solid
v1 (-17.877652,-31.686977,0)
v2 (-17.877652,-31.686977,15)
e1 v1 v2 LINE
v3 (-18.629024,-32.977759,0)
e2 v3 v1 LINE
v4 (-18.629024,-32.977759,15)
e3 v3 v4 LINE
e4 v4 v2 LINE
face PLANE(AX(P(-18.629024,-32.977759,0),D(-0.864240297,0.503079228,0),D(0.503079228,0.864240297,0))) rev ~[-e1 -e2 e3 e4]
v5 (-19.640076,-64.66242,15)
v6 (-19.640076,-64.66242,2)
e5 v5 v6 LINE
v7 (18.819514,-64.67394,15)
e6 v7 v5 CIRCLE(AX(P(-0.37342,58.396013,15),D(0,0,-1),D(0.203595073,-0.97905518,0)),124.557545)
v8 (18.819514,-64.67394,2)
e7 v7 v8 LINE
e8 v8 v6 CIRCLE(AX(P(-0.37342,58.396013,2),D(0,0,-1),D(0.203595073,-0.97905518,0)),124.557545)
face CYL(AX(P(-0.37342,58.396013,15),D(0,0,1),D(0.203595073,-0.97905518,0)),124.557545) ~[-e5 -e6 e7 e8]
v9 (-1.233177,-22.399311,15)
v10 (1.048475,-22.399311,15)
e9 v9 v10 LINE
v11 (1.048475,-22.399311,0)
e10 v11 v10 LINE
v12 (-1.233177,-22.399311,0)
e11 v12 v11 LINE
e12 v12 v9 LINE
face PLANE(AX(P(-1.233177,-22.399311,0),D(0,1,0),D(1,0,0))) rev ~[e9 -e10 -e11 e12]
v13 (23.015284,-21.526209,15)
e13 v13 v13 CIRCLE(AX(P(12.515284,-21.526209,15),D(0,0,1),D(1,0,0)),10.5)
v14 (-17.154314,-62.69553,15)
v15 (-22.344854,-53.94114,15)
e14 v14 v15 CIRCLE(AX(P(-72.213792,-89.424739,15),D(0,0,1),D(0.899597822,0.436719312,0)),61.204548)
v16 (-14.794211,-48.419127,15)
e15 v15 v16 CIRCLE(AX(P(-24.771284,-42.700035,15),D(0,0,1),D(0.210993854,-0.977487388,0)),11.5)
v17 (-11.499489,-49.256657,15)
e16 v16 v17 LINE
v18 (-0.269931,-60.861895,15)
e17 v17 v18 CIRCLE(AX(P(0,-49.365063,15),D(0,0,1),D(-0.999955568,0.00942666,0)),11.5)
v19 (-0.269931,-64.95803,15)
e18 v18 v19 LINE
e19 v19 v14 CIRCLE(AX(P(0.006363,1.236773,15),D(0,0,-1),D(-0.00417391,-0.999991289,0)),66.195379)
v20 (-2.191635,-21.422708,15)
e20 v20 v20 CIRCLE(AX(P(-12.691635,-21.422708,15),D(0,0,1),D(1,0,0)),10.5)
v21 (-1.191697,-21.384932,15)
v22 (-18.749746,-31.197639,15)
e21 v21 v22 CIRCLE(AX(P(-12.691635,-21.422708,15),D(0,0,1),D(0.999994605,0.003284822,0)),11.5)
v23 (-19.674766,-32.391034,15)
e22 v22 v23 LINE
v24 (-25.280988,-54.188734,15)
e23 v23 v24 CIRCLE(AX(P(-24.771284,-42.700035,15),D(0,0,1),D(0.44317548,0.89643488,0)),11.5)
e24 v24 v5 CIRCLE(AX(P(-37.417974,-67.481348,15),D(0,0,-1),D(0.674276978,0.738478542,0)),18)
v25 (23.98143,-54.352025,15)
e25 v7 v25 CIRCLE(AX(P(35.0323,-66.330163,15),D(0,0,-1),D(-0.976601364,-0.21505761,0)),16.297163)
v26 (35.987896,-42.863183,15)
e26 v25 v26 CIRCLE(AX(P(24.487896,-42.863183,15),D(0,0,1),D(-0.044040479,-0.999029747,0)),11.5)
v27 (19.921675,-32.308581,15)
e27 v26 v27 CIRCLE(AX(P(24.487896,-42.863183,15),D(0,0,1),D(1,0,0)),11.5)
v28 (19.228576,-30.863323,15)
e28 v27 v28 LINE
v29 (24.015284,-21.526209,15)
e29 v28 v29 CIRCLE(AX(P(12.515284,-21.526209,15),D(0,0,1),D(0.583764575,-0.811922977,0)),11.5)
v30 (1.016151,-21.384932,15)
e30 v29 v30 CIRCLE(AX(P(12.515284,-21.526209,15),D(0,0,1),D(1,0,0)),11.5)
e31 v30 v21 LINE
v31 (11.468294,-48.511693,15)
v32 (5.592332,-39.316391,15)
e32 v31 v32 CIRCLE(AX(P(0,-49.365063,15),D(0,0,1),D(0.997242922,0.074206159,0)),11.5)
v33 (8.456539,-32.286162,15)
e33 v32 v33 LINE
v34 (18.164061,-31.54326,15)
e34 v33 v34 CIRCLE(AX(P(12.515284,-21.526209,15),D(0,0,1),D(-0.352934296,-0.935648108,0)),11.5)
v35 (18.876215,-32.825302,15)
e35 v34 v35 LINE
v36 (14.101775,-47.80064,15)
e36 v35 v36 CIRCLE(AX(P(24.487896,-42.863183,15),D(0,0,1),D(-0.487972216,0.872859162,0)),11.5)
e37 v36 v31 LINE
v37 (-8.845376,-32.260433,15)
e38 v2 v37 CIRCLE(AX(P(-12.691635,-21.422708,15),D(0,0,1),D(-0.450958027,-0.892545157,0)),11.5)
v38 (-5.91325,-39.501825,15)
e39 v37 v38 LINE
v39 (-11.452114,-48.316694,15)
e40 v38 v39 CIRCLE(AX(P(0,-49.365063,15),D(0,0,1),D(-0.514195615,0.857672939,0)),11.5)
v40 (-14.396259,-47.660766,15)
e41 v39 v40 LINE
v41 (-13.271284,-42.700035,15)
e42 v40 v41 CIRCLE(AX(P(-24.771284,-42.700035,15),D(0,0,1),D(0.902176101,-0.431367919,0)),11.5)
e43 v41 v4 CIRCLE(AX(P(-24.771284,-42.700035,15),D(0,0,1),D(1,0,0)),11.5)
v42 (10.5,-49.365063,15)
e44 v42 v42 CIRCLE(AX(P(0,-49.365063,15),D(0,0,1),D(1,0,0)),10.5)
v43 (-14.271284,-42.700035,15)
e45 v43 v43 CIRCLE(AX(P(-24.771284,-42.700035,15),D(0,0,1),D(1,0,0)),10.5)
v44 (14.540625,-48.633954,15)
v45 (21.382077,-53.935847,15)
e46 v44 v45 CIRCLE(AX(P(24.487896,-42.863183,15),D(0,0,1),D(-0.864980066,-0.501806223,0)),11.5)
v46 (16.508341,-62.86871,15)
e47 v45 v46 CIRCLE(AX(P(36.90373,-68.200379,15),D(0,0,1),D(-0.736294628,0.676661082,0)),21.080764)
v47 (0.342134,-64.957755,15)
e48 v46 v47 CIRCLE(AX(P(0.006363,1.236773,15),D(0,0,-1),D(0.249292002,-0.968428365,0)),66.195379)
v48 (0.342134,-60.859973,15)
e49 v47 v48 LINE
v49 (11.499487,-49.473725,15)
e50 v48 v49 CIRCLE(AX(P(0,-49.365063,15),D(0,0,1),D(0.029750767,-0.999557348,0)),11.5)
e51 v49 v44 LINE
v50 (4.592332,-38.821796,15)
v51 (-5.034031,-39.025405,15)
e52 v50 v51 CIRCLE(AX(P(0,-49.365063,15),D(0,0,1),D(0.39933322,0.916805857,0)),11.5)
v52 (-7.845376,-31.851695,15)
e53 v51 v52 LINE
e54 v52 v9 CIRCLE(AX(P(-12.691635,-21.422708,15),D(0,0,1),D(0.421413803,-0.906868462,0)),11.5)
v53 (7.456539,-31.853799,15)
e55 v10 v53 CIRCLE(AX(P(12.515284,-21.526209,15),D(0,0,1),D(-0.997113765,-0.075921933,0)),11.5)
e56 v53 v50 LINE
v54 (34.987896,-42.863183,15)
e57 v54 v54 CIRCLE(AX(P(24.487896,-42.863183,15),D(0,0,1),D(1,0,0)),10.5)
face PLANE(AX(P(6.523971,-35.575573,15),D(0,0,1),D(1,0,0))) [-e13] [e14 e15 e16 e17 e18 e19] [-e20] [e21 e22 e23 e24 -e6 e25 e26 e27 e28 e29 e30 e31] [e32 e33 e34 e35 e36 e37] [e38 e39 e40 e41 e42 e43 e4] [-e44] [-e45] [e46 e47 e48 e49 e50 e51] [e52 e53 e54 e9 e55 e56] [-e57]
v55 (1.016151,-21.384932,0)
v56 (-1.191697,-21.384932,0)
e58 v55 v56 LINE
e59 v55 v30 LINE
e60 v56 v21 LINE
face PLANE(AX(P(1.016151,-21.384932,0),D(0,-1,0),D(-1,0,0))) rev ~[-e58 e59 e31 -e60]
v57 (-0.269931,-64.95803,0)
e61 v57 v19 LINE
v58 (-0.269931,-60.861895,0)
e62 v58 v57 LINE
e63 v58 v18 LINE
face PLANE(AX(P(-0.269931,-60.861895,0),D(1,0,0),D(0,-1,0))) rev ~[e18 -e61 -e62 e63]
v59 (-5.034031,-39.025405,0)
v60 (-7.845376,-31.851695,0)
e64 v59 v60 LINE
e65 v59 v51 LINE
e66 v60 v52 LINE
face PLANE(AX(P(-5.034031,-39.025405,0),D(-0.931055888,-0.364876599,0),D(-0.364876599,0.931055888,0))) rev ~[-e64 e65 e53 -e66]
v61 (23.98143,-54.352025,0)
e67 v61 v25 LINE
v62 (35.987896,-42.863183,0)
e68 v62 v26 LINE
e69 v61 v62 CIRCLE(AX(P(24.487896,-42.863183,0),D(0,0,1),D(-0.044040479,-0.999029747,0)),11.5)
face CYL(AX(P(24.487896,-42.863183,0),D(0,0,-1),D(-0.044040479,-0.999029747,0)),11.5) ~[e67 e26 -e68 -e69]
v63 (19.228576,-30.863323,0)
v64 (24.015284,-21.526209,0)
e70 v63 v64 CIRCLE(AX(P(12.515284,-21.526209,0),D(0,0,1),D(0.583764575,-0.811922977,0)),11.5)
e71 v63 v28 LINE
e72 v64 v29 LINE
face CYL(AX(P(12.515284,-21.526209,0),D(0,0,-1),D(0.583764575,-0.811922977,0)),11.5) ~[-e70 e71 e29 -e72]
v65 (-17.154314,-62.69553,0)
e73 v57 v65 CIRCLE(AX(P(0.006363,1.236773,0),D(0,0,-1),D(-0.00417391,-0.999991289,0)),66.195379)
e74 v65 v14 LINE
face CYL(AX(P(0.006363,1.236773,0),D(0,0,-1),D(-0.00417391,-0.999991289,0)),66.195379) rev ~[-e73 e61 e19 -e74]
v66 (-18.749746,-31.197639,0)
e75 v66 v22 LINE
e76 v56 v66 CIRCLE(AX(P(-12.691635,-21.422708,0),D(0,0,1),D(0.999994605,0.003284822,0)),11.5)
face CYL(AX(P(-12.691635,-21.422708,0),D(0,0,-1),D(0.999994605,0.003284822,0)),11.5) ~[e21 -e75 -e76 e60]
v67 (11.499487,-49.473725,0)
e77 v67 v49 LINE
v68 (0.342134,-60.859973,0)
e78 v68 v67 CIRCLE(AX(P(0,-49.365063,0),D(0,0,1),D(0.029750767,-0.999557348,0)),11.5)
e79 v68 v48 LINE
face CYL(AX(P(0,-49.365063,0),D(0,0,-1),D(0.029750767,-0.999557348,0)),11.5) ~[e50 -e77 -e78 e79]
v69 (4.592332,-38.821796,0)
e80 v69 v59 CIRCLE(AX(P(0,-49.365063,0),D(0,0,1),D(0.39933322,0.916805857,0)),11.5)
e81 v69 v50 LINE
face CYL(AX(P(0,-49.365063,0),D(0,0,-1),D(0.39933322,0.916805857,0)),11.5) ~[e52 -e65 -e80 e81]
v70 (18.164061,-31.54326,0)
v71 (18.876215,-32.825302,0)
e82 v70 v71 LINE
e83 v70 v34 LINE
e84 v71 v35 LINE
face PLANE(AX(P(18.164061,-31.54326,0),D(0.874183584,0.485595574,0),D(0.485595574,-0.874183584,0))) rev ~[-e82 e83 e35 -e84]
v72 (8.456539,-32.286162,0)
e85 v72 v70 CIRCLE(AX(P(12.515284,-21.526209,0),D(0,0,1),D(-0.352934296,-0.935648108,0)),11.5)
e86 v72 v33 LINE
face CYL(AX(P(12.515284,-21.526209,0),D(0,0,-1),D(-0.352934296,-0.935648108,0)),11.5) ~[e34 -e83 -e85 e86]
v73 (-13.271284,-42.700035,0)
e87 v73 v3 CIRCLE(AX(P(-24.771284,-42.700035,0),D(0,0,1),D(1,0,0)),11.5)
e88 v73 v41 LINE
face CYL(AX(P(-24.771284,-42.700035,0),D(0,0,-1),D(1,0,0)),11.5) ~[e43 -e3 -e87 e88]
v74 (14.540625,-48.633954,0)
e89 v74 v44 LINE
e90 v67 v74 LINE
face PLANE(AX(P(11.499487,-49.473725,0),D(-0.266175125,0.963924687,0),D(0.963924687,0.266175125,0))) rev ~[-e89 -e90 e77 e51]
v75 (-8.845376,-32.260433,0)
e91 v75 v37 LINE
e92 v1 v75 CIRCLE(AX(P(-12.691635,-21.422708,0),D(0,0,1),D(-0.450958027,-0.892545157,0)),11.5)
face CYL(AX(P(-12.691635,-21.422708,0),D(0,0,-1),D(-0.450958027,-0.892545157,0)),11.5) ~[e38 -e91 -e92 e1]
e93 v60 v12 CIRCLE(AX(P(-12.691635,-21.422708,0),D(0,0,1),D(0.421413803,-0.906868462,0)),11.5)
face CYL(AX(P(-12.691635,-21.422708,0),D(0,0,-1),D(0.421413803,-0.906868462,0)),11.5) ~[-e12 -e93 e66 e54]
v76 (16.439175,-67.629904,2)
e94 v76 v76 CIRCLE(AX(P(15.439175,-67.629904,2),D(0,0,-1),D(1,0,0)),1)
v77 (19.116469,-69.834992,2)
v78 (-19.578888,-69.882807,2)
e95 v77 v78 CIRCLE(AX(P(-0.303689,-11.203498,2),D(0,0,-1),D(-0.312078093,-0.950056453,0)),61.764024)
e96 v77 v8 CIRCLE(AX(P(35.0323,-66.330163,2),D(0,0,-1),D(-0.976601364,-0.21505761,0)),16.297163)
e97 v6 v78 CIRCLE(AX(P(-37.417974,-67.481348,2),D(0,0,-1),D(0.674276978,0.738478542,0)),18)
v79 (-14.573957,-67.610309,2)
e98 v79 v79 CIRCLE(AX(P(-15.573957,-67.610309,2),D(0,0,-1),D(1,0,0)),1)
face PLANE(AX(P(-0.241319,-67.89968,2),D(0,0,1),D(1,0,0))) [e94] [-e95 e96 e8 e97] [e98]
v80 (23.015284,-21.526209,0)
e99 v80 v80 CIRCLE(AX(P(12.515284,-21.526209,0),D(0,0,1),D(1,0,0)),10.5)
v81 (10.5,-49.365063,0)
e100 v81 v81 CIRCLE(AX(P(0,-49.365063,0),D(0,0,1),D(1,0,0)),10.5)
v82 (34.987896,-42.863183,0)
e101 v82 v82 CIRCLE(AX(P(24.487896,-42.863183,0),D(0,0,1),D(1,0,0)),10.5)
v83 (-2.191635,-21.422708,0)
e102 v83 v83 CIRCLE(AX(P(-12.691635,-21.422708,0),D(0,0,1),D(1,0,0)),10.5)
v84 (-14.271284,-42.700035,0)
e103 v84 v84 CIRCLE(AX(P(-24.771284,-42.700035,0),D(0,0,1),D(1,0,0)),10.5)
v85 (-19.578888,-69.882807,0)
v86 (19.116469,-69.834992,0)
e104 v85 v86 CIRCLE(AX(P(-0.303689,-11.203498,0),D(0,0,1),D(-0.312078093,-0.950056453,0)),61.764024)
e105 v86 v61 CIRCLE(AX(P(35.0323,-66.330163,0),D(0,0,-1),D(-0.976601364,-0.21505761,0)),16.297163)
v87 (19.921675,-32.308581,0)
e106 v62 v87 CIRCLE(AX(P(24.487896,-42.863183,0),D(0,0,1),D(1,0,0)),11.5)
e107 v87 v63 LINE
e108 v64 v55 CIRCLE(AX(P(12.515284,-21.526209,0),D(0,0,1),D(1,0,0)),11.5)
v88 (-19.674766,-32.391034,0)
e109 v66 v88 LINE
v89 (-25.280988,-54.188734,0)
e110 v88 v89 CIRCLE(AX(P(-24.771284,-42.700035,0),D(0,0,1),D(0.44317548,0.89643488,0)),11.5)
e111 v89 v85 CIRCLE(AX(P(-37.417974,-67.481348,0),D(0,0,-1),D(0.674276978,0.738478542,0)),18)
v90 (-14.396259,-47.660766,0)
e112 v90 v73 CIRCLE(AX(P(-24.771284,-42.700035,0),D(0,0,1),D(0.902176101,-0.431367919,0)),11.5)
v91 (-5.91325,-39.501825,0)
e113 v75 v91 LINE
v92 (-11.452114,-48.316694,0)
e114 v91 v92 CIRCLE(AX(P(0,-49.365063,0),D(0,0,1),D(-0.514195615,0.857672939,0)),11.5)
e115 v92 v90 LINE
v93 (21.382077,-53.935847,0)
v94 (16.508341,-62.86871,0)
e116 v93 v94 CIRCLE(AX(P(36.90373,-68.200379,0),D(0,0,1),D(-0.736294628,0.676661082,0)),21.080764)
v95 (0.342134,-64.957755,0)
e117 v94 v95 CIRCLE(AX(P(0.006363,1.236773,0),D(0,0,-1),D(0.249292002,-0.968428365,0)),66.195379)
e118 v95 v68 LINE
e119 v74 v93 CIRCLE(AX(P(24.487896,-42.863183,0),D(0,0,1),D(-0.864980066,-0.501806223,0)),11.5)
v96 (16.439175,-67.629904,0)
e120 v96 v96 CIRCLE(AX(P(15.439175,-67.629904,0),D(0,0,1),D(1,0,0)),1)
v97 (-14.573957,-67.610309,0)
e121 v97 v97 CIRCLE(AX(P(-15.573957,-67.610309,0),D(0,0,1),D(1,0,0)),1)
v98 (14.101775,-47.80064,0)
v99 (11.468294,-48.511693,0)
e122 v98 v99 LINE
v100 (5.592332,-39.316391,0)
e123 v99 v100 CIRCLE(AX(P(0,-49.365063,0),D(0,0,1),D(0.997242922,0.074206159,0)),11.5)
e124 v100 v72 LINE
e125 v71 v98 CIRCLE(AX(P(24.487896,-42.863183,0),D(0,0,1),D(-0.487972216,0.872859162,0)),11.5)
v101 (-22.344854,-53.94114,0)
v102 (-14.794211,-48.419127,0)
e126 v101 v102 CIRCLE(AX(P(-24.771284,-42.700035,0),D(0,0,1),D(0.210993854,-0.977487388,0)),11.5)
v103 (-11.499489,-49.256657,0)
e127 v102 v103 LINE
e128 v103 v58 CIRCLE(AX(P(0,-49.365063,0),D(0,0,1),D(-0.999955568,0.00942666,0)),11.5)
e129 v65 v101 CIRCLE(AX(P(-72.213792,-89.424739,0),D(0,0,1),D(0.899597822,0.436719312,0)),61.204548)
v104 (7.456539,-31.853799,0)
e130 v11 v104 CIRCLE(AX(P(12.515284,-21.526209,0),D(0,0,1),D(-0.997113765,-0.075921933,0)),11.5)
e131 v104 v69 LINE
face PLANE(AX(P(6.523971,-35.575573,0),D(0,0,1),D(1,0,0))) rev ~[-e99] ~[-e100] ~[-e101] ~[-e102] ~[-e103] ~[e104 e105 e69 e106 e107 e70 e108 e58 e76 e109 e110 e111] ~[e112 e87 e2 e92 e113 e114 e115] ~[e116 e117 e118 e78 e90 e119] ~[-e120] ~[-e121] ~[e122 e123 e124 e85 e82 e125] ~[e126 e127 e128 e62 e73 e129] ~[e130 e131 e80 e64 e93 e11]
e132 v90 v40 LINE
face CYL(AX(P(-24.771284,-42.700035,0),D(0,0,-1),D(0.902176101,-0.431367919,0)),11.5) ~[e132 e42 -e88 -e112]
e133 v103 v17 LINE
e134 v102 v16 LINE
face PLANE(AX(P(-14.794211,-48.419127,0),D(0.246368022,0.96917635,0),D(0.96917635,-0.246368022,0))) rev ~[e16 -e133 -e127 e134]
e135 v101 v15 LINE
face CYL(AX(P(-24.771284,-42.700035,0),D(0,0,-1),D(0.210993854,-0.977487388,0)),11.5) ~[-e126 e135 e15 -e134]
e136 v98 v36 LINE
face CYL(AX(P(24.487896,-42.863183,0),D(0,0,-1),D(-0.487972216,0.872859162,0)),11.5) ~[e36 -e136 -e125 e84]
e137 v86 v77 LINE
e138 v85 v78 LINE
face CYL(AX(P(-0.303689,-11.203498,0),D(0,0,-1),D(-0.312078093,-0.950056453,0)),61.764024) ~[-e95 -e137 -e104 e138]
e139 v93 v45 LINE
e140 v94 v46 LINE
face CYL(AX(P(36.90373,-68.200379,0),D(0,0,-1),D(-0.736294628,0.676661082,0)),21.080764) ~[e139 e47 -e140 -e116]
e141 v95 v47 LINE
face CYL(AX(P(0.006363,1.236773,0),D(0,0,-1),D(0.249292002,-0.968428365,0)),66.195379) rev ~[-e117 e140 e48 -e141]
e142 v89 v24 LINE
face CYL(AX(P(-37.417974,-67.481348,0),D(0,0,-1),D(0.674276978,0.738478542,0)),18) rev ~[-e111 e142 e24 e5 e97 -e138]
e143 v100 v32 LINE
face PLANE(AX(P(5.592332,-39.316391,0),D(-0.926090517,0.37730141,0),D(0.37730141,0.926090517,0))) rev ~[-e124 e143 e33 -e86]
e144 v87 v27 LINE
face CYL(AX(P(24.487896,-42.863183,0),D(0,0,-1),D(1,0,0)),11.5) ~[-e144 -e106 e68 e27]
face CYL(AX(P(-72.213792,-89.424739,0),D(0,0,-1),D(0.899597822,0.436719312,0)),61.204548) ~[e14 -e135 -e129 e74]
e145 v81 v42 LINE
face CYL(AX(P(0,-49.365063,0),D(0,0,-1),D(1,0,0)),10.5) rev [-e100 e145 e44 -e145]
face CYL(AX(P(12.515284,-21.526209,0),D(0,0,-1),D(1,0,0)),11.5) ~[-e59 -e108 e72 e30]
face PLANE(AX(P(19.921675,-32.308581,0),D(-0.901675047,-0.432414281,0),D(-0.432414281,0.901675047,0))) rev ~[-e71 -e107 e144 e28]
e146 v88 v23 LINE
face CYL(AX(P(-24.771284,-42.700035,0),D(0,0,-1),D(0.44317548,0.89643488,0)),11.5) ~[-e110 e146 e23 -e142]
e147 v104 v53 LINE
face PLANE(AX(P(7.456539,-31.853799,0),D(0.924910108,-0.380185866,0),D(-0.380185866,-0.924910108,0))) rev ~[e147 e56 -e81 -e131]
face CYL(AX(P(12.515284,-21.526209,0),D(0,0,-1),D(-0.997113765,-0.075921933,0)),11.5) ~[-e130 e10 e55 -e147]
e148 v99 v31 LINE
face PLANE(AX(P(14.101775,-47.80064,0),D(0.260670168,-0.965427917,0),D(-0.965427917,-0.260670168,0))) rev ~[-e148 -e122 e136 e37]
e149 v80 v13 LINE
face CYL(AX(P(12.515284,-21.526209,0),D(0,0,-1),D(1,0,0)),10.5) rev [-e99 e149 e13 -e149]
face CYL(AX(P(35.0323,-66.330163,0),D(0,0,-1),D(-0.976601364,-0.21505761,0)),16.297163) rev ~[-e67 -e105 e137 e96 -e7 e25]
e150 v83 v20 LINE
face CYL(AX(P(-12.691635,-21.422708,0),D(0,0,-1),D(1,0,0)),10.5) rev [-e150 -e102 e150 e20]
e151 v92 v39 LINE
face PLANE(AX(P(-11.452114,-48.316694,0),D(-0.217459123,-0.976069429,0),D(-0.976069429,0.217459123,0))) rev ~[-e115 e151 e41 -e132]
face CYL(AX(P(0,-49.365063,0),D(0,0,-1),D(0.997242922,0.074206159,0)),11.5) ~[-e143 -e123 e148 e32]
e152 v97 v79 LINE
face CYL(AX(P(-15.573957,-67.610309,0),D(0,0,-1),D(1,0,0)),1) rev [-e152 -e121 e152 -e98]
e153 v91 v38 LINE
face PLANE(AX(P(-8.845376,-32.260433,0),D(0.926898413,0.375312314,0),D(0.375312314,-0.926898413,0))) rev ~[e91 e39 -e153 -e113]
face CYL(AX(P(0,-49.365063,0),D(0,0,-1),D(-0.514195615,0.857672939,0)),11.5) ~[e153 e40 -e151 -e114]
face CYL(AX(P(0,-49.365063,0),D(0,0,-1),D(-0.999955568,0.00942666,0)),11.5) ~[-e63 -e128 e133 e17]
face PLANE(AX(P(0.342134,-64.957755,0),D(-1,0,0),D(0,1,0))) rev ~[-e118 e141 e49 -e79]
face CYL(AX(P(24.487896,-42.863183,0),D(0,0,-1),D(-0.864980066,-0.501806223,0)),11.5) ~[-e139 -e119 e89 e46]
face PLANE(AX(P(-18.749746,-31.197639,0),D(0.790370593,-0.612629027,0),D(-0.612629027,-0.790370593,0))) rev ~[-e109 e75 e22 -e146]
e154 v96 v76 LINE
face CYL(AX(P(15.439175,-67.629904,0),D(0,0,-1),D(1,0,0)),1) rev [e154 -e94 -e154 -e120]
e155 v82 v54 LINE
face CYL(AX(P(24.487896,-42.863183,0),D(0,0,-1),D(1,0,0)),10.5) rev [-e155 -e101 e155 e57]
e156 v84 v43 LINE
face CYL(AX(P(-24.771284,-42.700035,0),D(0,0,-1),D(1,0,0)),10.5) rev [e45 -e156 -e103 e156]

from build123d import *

# Parameters (mm, degrees)
F0_R     = 10.5
F0_R_2   = 1
F1_DEPTH = 15
F3_DEPTH = 13


# Not quite as in the source:
# - a feature names something its author has since deleted; it is built from what else it names


with BuildPart() as f1:
    # F0 (on Top) → F1 (new body)
    with BuildSketch(Plane.XY):
        with BuildLine():
            ThreePointArc((8.456539156, -32.2861623243), (7.9514162152, -32.0818291381), (7.456539156, -31.853798586))
            Line((7.456539156, -31.853798586), (4.5923320267, -38.8217959812))
            ThreePointArc((4.5923320267, -38.8217959812), (5.0983332026, -39.0569597997), (5.5923320267, -39.3163906642))
            Line((5.5923320267, -39.3163906642), (8.456539156, -32.2861623243))
        make_face()
        with BuildLine():
            ThreePointArc((5.5923320267, -39.3163906642), (5.0983332026, -39.0569597997), (4.5923320267, -38.8217959812))
            ThreePointArc((4.5923320267, -38.8217959812), (-0.2431846168, -37.8676348758), (-5.0340313362, -39.025405292))
            ThreePointArc((-5.0340313362, -39.025405292), (-5.4788213716, -39.2540536763), (-5.9132495676, -39.5018245418))
            ThreePointArc((-5.9132495676, -39.5018245418), (-9.7372709203, -43.2466031538), (-11.4521142662, -48.3166937306))
            ThreePointArc((-11.4521142662, -48.3166937306), (-11.4854214601, -48.7861903947), (-11.4994890326, -49.2566567486))
            ThreePointArc((-11.4994890326, -49.2566567486), (-8.2643935059, -57.3619252212), (-0.2699309272, -60.8618949578))
            ThreePointArc((-0.2699309272, -60.8618949578), (0.0361142384, -60.8650066318), (0.3421338242, -60.8599728394))
            ThreePointArc((0.3421338242, -60.8599728394), (8.2138697006, -57.4138113488), (11.4994866281, -49.473724691))
            ThreePointArc((11.4994866281, -49.473724691), (11.4998716563, -49.4193946208), (11.5, -49.365063338))
            ThreePointArc((11.5, -49.365063338), (11.4920706677, -48.9380835162), (11.4682936055, -48.5116925056))
            ThreePointArc((11.4682936055, -48.5116925056), (9.6904401721, -43.1726995509), (5.5923320267, -39.3163906642))
        make_face()
        with Locations((0, -49.365063338)):
            Circle(F0_R, mode=Mode.SUBTRACT)
        with BuildLine():
            Line((-5.0340313362, -39.025405292), (-7.8453759782, -31.8516950865))
            ThreePointArc((-7.8453759782, -31.8516950865), (-8.3405737258, -32.0678131455), (-8.8453759782, -32.2604332653))
            Line((-8.8453759782, -32.2604332653), (-5.9132495676, -39.5018245418))
            ThreePointArc((-5.9132495676, -39.5018245418), (-5.4788213716, -39.2540536763), (-5.0340313362, -39.025405292))
        make_face()
        with BuildLine():
            ThreePointArc((-11.4994890326, -49.2566567486), (-11.4854214601, -48.7861903947), (-11.4521142662, -48.3166937306))
            Line((-11.4521142662, -48.3166937306), (-14.3962585951, -47.6607659595))
            ThreePointArc((-14.3962585951, -47.6607659595), (-14.5881725993, -48.0436522978), (-14.7942107467, -48.4191269505))
            Line((-14.7942107467, -48.4191269505), (-11.4994890326, -49.2566567486))
        make_face()
        with BuildLine():
            Line((0.3421338242, -64.957754564), (0.3421338242, -60.8599728394))
            ThreePointArc((0.3421338242, -60.8599728394), (0.0361142384, -60.8650066318), (-0.2699309272, -60.8618949578))
            Line((-0.2699309272, -60.8618949578), (-0.2699309272, -64.9580295419))
            ThreePointArc((-0.2699309272, -64.9580295419), (0.0361017663, -64.9585994764), (0.3421338242, -64.957754564))
        make_face()
        with BuildLine():
            ThreePointArc((14.5406251326, -48.6339542886), (14.3126656094, -48.2217915649), (14.1017745949, -47.8006400066))
            Line((14.1017745949, -47.8006400066), (11.4682936055, -48.5116925056))
            ThreePointArc((11.4682936055, -48.5116925056), (11.4920706677, -48.9380835162), (11.5, -49.365063338))
            ThreePointArc((11.5, -49.365063338), (11.4998716563, -49.4193946208), (11.4994866281, -49.473724691))
            Line((11.4994866281, -49.473724691), (14.5406251326, -48.6339542886))
        make_face()
        with BuildLine():
            ThreePointArc((-18.6290237609, -32.9777593238), (-19.1442423903, -32.6707574729), (-19.6747657372, -32.391033768))
            ThreePointArc((-19.6747657372, -32.391033768), (-35.9088169714, -39.8355359758), (-25.2809881049, -54.1887337442))
            ThreePointArc((-25.2809881049, -54.1887337442), (-23.804958589, -54.1593636462), (-22.3448544462, -53.9411398473))
            ThreePointArc((-22.3448544462, -53.9411398473), (-17.9826996587, -51.9825521015), (-14.7942107467, -48.4191269505))
            ThreePointArc((-14.7942107467, -48.4191269505), (-14.5881725993, -48.0436522978), (-14.3962585951, -47.6607659595))
            ThreePointArc((-14.3962585951, -47.6607659595), (-13.5560532822, -45.2433801805), (-13.2712837616, -42.7000348848))
            ThreePointArc((-13.2712837616, -42.7000348848), (-14.6993924296, -37.1496290442), (-18.6290237609, -32.9777593238))
        make_face()
        with Locations((-24.7712837616, -42.7000348848)):
            Circle(F0_R, mode=Mode.SUBTRACT)
        with BuildLine():
            ThreePointArc((19.1164688634, -69.8349915238), (19.4845895022, -61.444857772), (23.9814303791, -54.3520248186))
            ThreePointArc((23.9814303791, -54.3520248186), (22.6698061738, -54.2185580929), (21.3820772546, -53.9358468382))
            ThreePointArc((21.3820772546, -53.9358468382), (18.3981233109, -58.1037903348), (16.5083411563, -62.8687098028))
            ThreePointArc((16.5083411563, -62.8687098028), (8.4897865212, -64.4127490141), (0.3421338242, -64.957754564))
            ThreePointArc((0.3421338242, -64.957754564), (0.0361017663, -64.9585994764), (-0.2699309272, -64.9580295419))
            ThreePointArc((-0.2699309272, -64.9580295419), (-8.785207594, -64.3721937184), (-17.154313878, -62.6955302663))
            ThreePointArc((-17.154313878, -62.6955302663), (-19.5673016908, -58.2102584784), (-22.3448544462, -53.9411398473))
            ThreePointArc((-22.3448544462, -53.9411398473), (-23.804958589, -54.1593636462), (-25.2809881049, -54.1887337442))
            ThreePointArc((-25.2809881049, -54.1887337442), (-20.5000187239, -61.334576051), (-19.5788875855, -69.8828067405))
            ThreePointArc((-19.5788875855, -69.8828067405), (-0.2273681462, -72.9674740069), (19.1164688634, -69.8349915238))
        make_face()
        with Locations((-15.5739570037, -67.6103085279)):
            Circle(F0_R_2, mode=Mode.SUBTRACT)
        with Locations((15.4391750693, -67.6299035549)):
            Circle(F0_R_2, mode=Mode.SUBTRACT)
        with BuildLine():
            ThreePointArc((-1.1916347077, -21.4227077758), (-1.1916502185, -21.4038200259), (-1.1916967507, -21.384932327))
            ThreePointArc((-1.1916967507, -21.384932327), (-18.3019531043, -11.3840660604), (-18.7497462956, -31.1976391816))
            ThreePointArc((-18.7497462956, -31.1976391816), (-18.319020566, -31.4517919016), (-17.8776520238, -31.6869770823))
            ThreePointArc((-17.8776520238, -31.6869770823), (-13.4202987359, -32.8995997215), (-8.8453759782, -32.2604332653))
            ThreePointArc((-8.8453759782, -32.2604332653), (-8.3405737258, -32.0678131455), (-7.8453759782, -31.8516950865))
            ThreePointArc((-7.8453759782, -31.8516950865), (-3.2683745706, -28.0145336524), (-1.2331773275, -22.3993113114))
            ThreePointArc((-1.2331773275, -22.3993113114), (-1.2020250565, -21.9114511274), (-1.1916347077, -21.4227077758))
        make_face()
        with Locations((-12.6916347077, -21.4227077758)):
            Circle(F0_R, mode=Mode.SUBTRACT)
        with BuildLine():
            ThreePointArc((-17.8776520238, -31.6869770823), (-18.319020566, -31.4517919016), (-18.7497462956, -31.1976391816))
            Line((-18.7497462956, -31.1976391816), (-19.6747657372, -32.391033768))
            ThreePointArc((-19.6747657372, -32.391033768), (-19.1442423903, -32.6707574729), (-18.6290237609, -32.9777593238))
            Line((-18.6290237609, -32.9777593238), (-17.8776520238, -31.6869770823))
        make_face()
        with BuildLine():
            ThreePointArc((1.0484752677, -22.3993113114), (1.0211177974, -21.8924785724), (1.0161513841, -21.384932327))
            Line((1.0161513841, -21.384932327), (-1.1916967507, -21.384932327))
            ThreePointArc((-1.1916967507, -21.384932327), (-1.1916502185, -21.4038200259), (-1.1916347077, -21.4227077758))
            ThreePointArc((-1.1916347077, -21.4227077758), (-1.2020250565, -21.9114511274), (-1.2331773275, -22.3993113114))
            Line((-1.2331773275, -22.3993113114), (1.0484752677, -22.3993113114))
        make_face()
        with BuildLine():
            ThreePointArc((19.2285761762, -30.8633233175), (22.7488768974, -26.7724999097), (24.0152835635, -21.5262090793))
            ThreePointArc((24.0152835635, -21.5262090793), (12.5859232723, -10.0264260365), (1.0161513841, -21.384932327))
            ThreePointArc((1.0161513841, -21.384932327), (1.0211177974, -21.8924785724), (1.0484752677, -22.3993113114))
            ThreePointArc((1.0484752677, -22.3993113114), (2.9958137546, -27.97831684), (7.456539156, -31.853798586))
            ThreePointArc((7.456539156, -31.853798586), (7.9514162152, -32.0818291381), (8.456539156, -32.2861623243))
            ThreePointArc((8.456539156, -32.2861623243), (13.3927953164, -32.9926807739), (18.1640607336, -31.5432603661))
            ThreePointArc((18.1640607336, -31.5432603661), (18.7056608481, -31.2179183751), (19.2285761762, -30.8633233175))
        make_face()
        with Locations((12.5152835635, -21.5262090793)):
            Circle(F0_R, mode=Mode.SUBTRACT)
        with BuildLine():
            Line((19.9216749616, -32.3085805793), (19.2285761762, -30.8633233175))
            ThreePointArc((19.2285761762, -30.8633233175), (18.7056608481, -31.2179183751), (18.1640607336, -31.5432603661))
            Line((18.1640607336, -31.5432603661), (18.8762154015, -32.8253023654))
            ThreePointArc((18.8762154015, -32.8253023654), (19.3923910412, -32.5536807799), (19.9216749616, -32.3085805793))
        make_face()
        with BuildLine():
            ThreePointArc((35.9878958911, -42.8631827235), (30.8021044444, -33.251691146), (19.9216749616, -32.3085805793))
            ThreePointArc((19.9216749616, -32.3085805793), (19.3923910412, -32.5536807799), (18.8762154015, -32.8253023654))
            ThreePointArc((18.8762154015, -32.8253023654), (13.5312723299, -39.3699893221), (14.1017745949, -47.8006400066))
            ThreePointArc((14.1017745949, -47.8006400066), (14.3126656094, -48.2217915649), (14.5406251326, -48.6339542886))
            ThreePointArc((14.5406251326, -48.6339542886), (17.4435150212, -51.9531056143), (21.3820772546, -53.9358468382))
            ThreePointArc((21.3820772546, -53.9358468382), (22.6698061738, -54.2185580929), (23.9814303791, -54.3520248186))
            ThreePointArc((23.9814303791, -54.3520248186), (32.4385451291, -51.1720440591), (35.9878958911, -42.8631827235))
        make_face()
        with Locations((24.4878958911, -42.8631827235)):
            Circle(F0_R, mode=Mode.SUBTRACT)
    extrude(amount=F1_DEPTH)

    # F2 (on face) → F3 (cut)
    with BuildSketch(Plane.XY.offset(15)):
        with BuildLine():
            Line((-25.4734057233, -63.6063340564), (-25.4734057233, -67.6063340564))
            ThreePointArc((-25.4734057233, -67.6063340564), (-0.2376476142, -73.3314436205), (24.9858820328, -67.5526964371))
            Line((24.9858820328, -67.5526964371), (24.9858820328, -63.5526964371))
            ThreePointArc((24.9858820328, -63.5526964371), (-0.2410172674, -66.1614613713), (-25.4734057233, -63.6063340564))
        make_face()
    extrude(amount=-F3_DEPTH, mode=Mode.SUBTRACT)


solid = f1.part
